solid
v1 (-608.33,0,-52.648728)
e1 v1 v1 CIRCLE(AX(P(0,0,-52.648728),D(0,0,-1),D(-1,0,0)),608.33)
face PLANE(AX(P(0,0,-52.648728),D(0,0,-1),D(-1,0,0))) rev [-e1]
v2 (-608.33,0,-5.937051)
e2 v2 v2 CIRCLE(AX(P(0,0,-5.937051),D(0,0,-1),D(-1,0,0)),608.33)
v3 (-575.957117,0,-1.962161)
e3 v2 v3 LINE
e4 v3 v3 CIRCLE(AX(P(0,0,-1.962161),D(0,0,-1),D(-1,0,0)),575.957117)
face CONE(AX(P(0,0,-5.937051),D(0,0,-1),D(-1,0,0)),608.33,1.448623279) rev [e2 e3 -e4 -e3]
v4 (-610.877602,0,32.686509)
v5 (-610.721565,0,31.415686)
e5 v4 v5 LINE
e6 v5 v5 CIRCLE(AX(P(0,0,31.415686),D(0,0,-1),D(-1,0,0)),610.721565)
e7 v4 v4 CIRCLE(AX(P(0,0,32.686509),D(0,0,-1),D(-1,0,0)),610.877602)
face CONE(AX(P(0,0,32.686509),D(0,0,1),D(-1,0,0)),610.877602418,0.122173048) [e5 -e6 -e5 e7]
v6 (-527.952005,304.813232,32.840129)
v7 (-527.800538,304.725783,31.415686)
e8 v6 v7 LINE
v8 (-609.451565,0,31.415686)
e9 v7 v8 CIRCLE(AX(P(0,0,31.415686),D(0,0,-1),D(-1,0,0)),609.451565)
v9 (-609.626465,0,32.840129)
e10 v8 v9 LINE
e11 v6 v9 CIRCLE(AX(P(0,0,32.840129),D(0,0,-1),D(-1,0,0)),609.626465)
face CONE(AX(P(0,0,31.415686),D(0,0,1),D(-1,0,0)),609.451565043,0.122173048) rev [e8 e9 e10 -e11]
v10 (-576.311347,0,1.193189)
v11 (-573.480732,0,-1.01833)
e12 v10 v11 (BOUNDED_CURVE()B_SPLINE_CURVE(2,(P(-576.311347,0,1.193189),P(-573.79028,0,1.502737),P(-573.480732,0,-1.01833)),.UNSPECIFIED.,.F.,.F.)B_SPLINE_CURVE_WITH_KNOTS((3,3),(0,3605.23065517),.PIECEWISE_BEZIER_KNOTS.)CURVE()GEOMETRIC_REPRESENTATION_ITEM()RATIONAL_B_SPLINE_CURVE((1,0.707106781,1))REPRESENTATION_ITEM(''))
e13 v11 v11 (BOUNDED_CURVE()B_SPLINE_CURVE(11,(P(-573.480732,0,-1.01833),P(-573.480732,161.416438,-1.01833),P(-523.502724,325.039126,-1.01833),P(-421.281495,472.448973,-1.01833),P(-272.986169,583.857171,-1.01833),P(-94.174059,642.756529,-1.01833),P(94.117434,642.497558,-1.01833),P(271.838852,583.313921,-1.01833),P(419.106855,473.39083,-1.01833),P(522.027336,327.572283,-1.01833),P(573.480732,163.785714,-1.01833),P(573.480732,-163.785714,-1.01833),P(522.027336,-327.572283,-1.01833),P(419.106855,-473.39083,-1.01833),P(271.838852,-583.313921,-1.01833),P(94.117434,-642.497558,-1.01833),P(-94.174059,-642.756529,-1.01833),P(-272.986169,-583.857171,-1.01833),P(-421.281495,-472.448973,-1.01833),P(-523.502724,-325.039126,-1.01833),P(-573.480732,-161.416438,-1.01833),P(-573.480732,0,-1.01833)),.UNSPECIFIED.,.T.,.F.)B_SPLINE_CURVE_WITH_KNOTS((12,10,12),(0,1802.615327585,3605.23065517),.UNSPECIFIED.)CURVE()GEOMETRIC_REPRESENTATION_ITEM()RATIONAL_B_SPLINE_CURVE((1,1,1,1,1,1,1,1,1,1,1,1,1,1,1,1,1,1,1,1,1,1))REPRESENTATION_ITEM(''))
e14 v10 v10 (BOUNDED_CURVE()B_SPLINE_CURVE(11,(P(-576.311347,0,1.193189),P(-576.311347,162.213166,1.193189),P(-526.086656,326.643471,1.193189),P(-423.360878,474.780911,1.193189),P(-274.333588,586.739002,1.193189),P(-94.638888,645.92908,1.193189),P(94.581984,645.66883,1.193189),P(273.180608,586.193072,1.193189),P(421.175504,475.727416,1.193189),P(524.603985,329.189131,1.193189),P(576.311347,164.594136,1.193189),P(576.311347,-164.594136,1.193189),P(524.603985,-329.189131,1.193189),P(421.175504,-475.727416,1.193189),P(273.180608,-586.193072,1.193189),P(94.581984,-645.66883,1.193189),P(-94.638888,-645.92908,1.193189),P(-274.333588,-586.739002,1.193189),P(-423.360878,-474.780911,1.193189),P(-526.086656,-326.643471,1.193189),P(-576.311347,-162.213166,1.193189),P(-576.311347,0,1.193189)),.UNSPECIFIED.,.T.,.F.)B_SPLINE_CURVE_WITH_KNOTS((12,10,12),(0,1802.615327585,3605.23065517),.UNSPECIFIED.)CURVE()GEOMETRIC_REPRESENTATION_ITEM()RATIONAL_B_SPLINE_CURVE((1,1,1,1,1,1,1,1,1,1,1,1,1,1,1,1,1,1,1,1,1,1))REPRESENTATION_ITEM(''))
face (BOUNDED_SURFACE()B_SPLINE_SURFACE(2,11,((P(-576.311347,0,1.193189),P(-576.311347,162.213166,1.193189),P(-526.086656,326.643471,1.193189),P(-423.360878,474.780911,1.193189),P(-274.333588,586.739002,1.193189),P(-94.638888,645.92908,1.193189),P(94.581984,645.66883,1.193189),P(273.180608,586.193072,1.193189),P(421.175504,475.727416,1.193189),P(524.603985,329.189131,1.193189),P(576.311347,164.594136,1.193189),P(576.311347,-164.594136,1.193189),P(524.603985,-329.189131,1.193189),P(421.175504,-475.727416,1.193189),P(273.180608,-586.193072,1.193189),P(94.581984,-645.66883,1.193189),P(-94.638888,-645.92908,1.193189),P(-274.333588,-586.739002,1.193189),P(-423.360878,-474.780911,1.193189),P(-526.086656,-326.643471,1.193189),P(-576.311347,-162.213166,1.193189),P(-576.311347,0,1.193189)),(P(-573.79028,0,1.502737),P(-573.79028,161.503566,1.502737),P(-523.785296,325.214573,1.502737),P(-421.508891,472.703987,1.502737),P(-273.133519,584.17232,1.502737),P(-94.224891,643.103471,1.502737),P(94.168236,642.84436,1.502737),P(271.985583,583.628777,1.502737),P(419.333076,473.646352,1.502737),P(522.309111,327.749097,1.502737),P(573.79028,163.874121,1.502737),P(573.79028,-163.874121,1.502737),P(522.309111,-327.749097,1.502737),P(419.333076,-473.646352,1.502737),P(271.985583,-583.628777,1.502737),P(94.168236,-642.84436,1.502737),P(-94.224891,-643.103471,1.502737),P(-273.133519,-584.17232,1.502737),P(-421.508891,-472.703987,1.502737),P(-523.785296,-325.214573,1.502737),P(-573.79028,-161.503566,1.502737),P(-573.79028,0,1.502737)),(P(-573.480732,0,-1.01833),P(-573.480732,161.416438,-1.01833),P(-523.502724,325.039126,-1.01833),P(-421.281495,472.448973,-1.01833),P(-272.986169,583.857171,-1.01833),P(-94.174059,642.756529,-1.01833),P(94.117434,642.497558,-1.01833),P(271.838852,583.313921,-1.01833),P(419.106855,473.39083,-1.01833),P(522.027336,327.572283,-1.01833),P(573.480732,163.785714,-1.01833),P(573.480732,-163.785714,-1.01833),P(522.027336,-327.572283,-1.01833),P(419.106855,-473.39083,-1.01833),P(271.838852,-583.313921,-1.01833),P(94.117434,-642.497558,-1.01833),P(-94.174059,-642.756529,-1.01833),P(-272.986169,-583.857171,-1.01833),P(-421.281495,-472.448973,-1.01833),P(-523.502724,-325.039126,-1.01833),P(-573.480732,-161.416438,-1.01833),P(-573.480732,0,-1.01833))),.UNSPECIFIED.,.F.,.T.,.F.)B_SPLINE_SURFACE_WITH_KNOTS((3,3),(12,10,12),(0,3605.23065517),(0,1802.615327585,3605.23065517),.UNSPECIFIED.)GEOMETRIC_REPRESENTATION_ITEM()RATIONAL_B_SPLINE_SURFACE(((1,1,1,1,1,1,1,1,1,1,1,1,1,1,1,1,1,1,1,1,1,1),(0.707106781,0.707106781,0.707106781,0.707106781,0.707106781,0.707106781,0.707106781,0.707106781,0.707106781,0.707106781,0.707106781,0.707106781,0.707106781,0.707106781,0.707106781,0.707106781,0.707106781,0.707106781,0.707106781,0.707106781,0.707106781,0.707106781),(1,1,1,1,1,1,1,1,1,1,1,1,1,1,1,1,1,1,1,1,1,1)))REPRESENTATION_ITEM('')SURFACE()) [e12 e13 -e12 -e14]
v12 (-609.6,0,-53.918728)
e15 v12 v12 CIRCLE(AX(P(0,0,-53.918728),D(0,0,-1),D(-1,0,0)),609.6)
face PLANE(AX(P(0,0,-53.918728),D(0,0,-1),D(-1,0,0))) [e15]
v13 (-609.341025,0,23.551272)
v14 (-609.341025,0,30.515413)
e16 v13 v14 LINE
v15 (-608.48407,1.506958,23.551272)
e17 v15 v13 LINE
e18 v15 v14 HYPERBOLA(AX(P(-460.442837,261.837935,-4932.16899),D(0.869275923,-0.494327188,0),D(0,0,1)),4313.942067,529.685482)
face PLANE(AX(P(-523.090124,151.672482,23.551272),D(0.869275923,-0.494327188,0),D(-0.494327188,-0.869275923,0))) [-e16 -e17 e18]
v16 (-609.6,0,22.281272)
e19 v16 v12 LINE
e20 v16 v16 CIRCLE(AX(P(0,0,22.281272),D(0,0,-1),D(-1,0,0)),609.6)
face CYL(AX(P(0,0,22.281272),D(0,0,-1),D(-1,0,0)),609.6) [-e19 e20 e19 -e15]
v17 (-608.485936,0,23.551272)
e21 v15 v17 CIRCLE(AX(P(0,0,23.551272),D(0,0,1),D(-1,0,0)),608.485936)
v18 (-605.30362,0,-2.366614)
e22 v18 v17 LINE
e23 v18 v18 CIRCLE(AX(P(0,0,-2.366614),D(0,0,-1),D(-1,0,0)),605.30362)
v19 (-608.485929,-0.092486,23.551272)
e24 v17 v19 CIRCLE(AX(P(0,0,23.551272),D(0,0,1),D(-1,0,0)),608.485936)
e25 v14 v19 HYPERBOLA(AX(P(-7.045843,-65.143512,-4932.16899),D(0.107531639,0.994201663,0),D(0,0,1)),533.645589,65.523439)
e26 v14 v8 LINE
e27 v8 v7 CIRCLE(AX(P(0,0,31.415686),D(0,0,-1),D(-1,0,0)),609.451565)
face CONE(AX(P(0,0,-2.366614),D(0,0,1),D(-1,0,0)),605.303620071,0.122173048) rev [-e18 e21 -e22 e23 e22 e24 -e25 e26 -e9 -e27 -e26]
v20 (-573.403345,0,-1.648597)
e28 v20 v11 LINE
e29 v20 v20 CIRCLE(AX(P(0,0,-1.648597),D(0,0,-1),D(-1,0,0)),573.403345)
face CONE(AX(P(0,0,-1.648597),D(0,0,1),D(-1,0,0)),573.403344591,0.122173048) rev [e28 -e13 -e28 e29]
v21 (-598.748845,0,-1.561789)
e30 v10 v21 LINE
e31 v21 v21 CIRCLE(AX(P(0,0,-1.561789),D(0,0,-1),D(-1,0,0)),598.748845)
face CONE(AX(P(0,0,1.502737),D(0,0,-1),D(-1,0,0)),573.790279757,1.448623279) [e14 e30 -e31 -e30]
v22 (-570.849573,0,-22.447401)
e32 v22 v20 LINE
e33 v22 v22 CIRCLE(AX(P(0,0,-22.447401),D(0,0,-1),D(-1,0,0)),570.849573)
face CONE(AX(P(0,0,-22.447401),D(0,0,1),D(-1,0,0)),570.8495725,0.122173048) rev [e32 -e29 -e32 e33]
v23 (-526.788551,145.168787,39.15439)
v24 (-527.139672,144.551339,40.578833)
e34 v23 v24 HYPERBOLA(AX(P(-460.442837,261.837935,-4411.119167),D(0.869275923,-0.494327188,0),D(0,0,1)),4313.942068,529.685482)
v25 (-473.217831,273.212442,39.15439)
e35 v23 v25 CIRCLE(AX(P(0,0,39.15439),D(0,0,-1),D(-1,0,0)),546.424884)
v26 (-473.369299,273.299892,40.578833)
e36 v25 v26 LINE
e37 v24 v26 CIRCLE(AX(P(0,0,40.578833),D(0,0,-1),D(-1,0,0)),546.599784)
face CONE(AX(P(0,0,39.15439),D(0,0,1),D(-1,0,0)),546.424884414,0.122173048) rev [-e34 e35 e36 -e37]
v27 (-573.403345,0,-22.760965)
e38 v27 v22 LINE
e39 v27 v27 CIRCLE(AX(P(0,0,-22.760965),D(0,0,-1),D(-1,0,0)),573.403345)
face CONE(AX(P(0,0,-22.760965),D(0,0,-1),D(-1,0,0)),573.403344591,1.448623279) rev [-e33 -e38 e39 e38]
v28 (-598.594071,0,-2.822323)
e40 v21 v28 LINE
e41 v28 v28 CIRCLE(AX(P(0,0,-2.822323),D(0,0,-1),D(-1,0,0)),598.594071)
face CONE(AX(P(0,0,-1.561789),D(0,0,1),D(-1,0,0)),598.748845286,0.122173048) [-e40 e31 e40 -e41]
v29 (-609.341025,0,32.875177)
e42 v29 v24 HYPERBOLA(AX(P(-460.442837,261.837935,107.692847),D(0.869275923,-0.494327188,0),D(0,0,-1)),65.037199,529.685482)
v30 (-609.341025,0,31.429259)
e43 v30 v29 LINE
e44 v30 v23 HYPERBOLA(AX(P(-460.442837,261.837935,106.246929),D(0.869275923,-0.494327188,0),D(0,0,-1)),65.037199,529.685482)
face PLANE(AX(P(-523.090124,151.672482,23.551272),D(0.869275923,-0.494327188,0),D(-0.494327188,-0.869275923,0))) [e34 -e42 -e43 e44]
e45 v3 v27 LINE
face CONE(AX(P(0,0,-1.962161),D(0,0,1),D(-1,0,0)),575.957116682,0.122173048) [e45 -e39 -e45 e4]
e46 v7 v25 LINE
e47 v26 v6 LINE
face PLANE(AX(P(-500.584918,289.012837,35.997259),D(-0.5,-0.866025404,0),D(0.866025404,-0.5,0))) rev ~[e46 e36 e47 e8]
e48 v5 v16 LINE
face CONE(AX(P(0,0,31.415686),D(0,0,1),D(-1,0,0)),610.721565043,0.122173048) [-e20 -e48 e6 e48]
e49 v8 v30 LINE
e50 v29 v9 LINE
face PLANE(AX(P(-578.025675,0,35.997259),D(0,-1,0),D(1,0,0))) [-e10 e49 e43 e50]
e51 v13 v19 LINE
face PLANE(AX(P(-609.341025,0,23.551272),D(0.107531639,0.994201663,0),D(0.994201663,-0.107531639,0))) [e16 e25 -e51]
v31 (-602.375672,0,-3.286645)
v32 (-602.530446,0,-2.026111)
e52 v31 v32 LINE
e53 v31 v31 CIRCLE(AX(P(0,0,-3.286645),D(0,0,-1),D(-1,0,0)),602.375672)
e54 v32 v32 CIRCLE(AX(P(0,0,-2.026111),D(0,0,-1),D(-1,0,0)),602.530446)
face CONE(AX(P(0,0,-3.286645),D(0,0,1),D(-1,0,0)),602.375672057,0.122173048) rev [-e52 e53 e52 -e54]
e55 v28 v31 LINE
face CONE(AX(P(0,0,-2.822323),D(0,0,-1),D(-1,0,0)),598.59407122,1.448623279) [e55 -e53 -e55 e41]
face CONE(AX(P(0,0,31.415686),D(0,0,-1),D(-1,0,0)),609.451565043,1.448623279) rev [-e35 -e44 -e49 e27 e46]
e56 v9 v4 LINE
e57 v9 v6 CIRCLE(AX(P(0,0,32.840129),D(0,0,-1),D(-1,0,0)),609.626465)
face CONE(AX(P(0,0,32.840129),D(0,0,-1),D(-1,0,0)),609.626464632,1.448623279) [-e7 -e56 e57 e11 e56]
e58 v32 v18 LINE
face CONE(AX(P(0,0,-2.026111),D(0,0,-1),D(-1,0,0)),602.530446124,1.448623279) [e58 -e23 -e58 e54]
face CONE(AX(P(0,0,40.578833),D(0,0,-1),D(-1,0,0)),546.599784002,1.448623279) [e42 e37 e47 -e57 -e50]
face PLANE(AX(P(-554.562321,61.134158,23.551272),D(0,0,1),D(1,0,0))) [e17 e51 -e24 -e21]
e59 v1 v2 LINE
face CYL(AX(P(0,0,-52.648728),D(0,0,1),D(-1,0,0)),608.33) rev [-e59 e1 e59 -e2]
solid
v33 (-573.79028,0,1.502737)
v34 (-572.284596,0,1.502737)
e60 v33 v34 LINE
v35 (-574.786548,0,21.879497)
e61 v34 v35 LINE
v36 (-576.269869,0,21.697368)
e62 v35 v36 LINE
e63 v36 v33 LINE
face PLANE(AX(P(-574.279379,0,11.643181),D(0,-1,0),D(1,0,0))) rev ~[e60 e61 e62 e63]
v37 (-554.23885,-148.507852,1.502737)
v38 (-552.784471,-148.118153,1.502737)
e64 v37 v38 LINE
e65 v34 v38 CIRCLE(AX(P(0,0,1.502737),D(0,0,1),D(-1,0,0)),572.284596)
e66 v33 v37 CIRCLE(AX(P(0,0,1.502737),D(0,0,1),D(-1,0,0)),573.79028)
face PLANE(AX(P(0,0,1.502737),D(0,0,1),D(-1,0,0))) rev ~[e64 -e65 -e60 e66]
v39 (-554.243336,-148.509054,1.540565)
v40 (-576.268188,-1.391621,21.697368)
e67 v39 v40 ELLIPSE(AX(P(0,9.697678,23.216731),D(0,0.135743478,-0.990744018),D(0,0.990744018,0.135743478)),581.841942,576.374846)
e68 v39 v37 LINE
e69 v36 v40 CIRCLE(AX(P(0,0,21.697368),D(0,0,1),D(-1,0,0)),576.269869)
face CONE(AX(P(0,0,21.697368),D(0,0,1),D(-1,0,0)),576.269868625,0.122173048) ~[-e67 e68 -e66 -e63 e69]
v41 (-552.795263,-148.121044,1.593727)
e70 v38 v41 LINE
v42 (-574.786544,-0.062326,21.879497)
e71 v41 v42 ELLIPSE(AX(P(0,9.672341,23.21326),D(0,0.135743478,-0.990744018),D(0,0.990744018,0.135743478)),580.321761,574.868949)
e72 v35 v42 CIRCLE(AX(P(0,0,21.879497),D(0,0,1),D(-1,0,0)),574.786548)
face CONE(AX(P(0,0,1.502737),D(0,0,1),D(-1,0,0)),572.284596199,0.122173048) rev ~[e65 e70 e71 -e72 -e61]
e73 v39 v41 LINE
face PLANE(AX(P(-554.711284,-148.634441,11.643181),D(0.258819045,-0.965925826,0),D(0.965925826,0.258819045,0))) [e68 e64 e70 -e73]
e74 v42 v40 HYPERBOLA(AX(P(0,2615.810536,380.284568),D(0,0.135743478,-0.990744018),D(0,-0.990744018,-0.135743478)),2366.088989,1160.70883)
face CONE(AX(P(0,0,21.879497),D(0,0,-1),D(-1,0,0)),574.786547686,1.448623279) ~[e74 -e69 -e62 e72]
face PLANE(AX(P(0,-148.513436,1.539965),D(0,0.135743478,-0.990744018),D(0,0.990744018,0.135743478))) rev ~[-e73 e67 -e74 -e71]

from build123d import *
from build123d import SkipClean  # not in build123d's __all__

# Parameters (mm, degrees)
F4_ANGLE  = 30
F5_R      = 2.54
F8_DEPTH  = 25.4
F9_ANGLE  = 15
F11_DEPTH = 584.2


with BuildPart() as f2:
    # F0 (on Front) → F2 (revolve)
    with BuildSketch(Plane.XZ):
        Polygon((-609.6, 22.2812721531), (-609.6, -3.1187278469), (-609.6, -53.9187278469), (0, -53.9187278469), (0, -52.6487278469), (-608.33, -52.6487278469), (-608.33, -5.9370508356), (-575.9571166824, -1.9621605723), (-573.4033445914, -22.7609651799), (-570.8495725003, -22.4474013951), (-573.4033445914, -1.6485967874), (-573.7902797567, 1.502737244), (-585.1143879206, 0.1123115955), (-598.7488452858, -1.5617892652), (-598.5940712197, -2.8223228778), (-602.3756720575, -3.2866450762), (-602.5304461236, -2.0261114636), (-605.3036200713, -2.3666144091), (-608.33, 22.2812721531), (-609.4515650434, 31.4156864082), (-609.6264646317, 32.840129245), (-610.8776024179, 32.6865088413), (-610.7215650434, 31.4156864082), align=None)
    revolve(axis=Axis((0, 0, -10.9399985522), (0, 0, -1)))

    # F0 (on Front) → F4 (revolve)
    with BuildSketch(Plane.XZ):
        Polygon((-546.5997840024, 40.5788325512), (-609.6264646317, 32.840129245), (-609.4515650434, 31.4156864082), (-546.4248844142, 39.1543897144), align=None)
    with SkipClean():  # cleaning this boolean's faces spoils the solid; the shape is the same uncleaned
        revolve(axis=Axis((0, 0, -10.9399985522), (0, 0, -1)), revolution_arc=F4_ANGLE)

    # F5
    f5_edges = [f2.edges().sort_by_distance(p)[0] for p in [
        (573.79028, 0, 1.502737),
    ]]
    fillet(f5_edges, radius=F5_R)

    # F7 (on offset) → F8 (cut)
    with BuildSketch(Plane.XY.offset(23.5512721531)):
        Polygon((-523.0901241302, 151.6724824905), (-609.3410253525, 0), (-542.667388916, -7.2113391943), align=None)
    with SkipClean():  # cleaning this boolean's faces spoils the solid; the shape is the same uncleaned
        extrude(amount=F8_DEPTH, mode=Mode.SUBTRACT)


with BuildPart() as f9:
    # F0 (on Front) → F9 (revolve)
    with BuildSketch(Plane.XZ):
        Polygon((-576.2698686253, 21.6973679888), (-573.7902797567, 1.502737244), (-572.2845961987, 1.502737244), (-574.7865476856, 21.8794968991), align=None)
    revolve(axis=Axis((0, 0, -10.9399985522), (0, 0, 1)), revolution_arc=F9_ANGLE)

    # F10 (on Right) → F11 (cut)
    with BuildSketch(Plane.YZ):
        Polygon((-149.5092064142, 21.9517517835), (-148.5134363174, 1.5399645781), (0.4650368064, 21.9517517835), align=None)
    extrude(amount=-F11_DEPTH, mode=Mode.SUBTRACT)


solid = Compound([f2.part, f9.part])
